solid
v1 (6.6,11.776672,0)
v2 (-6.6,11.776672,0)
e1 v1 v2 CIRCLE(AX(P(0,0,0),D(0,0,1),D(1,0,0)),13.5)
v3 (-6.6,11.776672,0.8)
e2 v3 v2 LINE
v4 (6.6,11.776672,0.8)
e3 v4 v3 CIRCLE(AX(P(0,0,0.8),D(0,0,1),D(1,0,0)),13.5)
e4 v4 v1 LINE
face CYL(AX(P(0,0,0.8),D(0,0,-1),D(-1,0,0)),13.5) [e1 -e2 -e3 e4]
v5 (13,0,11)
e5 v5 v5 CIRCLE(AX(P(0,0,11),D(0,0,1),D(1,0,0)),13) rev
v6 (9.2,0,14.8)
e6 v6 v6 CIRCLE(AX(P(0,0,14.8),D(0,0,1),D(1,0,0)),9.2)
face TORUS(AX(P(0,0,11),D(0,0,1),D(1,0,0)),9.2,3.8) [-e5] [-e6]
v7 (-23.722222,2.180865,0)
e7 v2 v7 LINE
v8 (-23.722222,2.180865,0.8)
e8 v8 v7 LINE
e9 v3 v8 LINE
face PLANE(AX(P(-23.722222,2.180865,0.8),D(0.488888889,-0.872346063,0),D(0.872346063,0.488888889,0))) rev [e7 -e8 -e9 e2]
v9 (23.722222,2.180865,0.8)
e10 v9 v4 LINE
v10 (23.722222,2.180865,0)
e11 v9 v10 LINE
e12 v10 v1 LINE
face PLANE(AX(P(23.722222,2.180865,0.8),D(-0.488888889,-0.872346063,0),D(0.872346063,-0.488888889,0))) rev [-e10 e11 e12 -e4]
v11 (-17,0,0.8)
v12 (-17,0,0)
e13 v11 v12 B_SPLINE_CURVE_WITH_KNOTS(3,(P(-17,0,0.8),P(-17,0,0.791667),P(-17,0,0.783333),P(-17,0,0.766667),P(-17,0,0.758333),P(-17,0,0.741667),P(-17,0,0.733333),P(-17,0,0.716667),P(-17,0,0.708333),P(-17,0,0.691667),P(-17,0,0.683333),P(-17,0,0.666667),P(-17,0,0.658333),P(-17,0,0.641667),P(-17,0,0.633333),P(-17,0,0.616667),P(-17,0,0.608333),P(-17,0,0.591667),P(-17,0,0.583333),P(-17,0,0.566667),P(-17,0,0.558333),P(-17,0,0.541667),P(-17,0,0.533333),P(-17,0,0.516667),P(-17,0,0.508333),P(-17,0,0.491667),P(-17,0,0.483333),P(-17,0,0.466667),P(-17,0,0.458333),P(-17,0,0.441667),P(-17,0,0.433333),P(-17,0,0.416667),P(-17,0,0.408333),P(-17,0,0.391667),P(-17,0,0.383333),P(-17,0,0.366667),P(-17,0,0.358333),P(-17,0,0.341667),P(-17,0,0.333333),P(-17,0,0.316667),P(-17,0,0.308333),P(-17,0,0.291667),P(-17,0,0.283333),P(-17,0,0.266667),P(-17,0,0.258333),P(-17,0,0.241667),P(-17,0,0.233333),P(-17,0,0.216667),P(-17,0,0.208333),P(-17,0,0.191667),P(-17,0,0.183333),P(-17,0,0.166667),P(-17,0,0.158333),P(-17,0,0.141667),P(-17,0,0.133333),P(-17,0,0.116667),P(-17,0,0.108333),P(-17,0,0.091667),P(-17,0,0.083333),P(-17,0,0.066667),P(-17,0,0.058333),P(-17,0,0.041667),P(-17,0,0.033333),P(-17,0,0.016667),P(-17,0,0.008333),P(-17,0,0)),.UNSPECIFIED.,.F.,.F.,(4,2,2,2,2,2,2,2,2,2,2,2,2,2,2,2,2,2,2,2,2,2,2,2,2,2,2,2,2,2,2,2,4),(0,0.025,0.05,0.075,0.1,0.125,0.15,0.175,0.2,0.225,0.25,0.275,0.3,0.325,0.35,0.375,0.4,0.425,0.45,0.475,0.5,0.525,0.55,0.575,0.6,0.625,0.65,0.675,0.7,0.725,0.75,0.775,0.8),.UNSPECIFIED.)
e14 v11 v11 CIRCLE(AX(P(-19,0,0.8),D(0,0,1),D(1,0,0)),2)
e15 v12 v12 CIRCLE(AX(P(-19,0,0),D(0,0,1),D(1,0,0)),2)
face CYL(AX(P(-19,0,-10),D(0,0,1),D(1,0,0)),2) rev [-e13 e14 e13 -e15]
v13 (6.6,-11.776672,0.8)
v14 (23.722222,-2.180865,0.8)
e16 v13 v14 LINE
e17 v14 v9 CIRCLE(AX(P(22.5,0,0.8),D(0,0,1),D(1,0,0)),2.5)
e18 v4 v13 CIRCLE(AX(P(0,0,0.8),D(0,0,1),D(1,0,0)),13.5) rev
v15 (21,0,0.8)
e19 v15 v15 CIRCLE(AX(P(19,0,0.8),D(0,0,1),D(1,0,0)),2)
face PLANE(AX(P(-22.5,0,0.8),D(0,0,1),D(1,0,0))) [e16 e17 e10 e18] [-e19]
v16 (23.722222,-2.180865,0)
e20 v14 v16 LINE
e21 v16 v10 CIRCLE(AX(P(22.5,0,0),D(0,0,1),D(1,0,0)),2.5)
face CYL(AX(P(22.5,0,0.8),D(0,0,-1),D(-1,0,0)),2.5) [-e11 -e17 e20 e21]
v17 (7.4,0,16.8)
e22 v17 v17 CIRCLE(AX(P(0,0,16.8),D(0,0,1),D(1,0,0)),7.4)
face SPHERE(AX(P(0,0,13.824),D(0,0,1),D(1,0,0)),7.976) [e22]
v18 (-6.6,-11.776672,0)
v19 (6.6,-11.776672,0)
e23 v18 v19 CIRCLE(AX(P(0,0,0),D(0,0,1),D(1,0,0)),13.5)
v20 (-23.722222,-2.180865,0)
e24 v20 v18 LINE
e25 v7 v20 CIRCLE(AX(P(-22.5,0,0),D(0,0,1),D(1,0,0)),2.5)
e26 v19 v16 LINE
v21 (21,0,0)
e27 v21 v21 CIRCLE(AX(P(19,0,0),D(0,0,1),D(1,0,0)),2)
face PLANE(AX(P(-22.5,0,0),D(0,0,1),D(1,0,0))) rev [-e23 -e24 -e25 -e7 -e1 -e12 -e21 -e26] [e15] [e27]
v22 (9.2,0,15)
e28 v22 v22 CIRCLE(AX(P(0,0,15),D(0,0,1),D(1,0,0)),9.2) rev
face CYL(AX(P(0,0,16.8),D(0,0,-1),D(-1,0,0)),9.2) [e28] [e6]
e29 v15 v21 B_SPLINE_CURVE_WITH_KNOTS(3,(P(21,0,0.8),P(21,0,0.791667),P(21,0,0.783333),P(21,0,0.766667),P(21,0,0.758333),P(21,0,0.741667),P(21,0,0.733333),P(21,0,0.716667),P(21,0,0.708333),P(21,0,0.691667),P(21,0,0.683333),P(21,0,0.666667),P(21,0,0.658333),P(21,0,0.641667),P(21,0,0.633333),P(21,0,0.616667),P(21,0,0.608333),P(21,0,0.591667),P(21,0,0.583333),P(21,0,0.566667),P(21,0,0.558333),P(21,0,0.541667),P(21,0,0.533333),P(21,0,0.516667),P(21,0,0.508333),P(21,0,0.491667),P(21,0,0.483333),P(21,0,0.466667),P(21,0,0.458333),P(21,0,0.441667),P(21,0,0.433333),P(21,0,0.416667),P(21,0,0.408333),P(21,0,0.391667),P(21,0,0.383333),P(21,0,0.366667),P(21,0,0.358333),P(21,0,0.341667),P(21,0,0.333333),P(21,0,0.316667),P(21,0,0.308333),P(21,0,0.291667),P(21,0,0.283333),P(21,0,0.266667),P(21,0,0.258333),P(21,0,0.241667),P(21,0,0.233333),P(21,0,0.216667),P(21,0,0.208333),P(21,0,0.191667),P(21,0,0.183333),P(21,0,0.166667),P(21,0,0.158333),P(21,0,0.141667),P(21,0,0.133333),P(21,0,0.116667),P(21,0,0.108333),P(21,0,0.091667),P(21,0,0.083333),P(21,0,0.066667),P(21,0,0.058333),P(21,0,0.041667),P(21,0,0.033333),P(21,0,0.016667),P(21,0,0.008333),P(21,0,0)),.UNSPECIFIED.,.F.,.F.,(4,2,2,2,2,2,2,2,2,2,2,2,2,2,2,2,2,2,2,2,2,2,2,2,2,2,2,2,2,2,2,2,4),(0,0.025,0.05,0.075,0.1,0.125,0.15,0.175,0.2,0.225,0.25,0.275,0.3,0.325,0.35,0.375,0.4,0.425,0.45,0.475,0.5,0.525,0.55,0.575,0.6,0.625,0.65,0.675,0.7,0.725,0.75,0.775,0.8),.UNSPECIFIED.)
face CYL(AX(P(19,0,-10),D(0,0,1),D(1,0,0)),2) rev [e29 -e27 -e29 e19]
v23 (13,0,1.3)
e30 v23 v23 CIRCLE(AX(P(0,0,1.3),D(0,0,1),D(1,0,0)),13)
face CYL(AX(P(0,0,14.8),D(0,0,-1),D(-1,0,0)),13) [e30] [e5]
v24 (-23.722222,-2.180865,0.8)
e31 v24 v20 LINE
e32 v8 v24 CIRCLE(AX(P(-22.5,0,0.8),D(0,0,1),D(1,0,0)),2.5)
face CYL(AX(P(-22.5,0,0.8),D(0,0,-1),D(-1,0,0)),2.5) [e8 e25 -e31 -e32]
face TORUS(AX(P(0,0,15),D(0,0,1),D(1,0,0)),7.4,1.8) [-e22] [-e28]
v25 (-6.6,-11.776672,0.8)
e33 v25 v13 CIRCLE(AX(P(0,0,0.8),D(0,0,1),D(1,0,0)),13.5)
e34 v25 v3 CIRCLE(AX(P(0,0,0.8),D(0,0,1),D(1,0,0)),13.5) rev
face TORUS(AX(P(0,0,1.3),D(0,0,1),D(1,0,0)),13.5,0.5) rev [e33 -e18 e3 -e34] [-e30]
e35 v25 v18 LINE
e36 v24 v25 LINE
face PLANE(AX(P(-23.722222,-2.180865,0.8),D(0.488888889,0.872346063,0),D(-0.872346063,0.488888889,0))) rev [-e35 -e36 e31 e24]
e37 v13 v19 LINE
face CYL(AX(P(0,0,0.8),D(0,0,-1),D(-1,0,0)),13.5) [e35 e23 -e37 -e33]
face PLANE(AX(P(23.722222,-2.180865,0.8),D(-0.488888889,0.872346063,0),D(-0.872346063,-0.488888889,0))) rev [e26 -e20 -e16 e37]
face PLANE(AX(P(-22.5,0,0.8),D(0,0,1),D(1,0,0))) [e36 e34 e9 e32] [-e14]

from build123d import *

# Parameters (mm, degrees)
SALIENTE_EXTRUIR1_DEPTH = 0.8
CROQUIS2_R              = 2
CORTAR_EXTRUIR1_DEPTH   = 10.8
CROQUIS3_R              = 13
SALIENTE_EXTRUIR2_DEPTH = 14
REDONDEO1_R             = 3.8
CROQUIS4_R              = 9.2
SALIENTE_EXTRUIR3_DEPTH = 2
REDONDEO2_R             = 1.8
C_PULA2_FACE_RADIUS     = 7.4
C_PULA2_HEIGHT          = 5
REDONDEO3_R             = 0.5


with BuildPart() as part:
    # Croquis1 → Saliente-Extruir1 (new body)
    with BuildSketch(Plane.XY):
        with BuildLine():
            Line((23.722222222, 2.180865158), (6.6, 11.776671856))
            ThreePointArc((6.6, 11.776671856), (0, 13.5), (-6.6, 11.776671856))
            Line((-6.6, 11.776671856), (-23.722222222, 2.180865158))
            ThreePointArc((-23.722222222, 2.180865158), (-25, 0), (-23.722222222, -2.180865158))
            Line((-23.722222222, -2.180865158), (-6.6, -11.776671856))
            ThreePointArc((-6.6, -11.776671856), (0, -13.5), (6.6, -11.776671856))
            Line((6.6, -11.776671856), (23.722222222, -2.180865158))
            ThreePointArc((23.722222222, -2.180865158), (25, 0), (23.722222222, 2.180865158))
        make_face()
    extrude(amount=SALIENTE_EXTRUIR1_DEPTH)

    # Croquis2 → Cortar-Extruir1 (cut)
    with BuildSketch(Plane.XY.offset(0.8)):
        with Locations((-19, 0)):
            Circle(CROQUIS2_R)
        with Locations((19, 0)):
            Circle(CROQUIS2_R)
    extrude(amount=-CORTAR_EXTRUIR1_DEPTH, mode=Mode.SUBTRACT)

    # Croquis3 → Saliente-Extruir2 (add)
    with BuildSketch(Plane.XY.offset(0.8)):
        Circle(CROQUIS3_R)
    extrude(amount=SALIENTE_EXTRUIR2_DEPTH)

    # Redondeo1
    redondeo1_edges = [part.edges().sort_by_distance(p)[0] for p in [
        (-13, 0, 14.8),
    ]]
    fillet(redondeo1_edges, radius=REDONDEO1_R)

    # Croquis4 → Saliente-Extruir3 (add)
    with BuildSketch(Plane.XY.offset(14.8)):
        Circle(CROQUIS4_R)
    extrude(amount=SALIENTE_EXTRUIR3_DEPTH)

    # Redondeo2
    redondeo2_edges = [part.edges().sort_by_distance(p)[0] for p in [
        (-9.2, 0, 16.8),
    ]]
    fillet(redondeo2_edges, radius=REDONDEO2_R)

    # Cúpula2: a dome of height H over a round flat face of radius A is a cap of a sphere of radius (A * A + H * H) / (2 * H)
    c_pula2_r = (C_PULA2_FACE_RADIUS * C_PULA2_FACE_RADIUS + C_PULA2_HEIGHT * C_PULA2_HEIGHT) / (2 * C_PULA2_HEIGHT)
    c_pula2_base = Plane((0, 0, 16.8), z_dir=(0, 0, 1))
    with Locations(c_pula2_base.offset(C_PULA2_HEIGHT - c_pula2_r)):
        c_pula2_ball = Sphere(c_pula2_r, mode=Mode.PRIVATE)
    add(split(c_pula2_ball, bisect_by=c_pula2_base, keep=Keep.TOP, mode=Mode.PRIVATE))

    # Redondeo3
    redondeo3_edges = [part.edges().sort_by_distance(p)[0] for p in [
        (-13, 0, 0.8),
    ]]
    fillet(redondeo3_edges, radius=REDONDEO3_R - 0.0001)  # a hair under: the kernel refuses the full size


solid = part.part
